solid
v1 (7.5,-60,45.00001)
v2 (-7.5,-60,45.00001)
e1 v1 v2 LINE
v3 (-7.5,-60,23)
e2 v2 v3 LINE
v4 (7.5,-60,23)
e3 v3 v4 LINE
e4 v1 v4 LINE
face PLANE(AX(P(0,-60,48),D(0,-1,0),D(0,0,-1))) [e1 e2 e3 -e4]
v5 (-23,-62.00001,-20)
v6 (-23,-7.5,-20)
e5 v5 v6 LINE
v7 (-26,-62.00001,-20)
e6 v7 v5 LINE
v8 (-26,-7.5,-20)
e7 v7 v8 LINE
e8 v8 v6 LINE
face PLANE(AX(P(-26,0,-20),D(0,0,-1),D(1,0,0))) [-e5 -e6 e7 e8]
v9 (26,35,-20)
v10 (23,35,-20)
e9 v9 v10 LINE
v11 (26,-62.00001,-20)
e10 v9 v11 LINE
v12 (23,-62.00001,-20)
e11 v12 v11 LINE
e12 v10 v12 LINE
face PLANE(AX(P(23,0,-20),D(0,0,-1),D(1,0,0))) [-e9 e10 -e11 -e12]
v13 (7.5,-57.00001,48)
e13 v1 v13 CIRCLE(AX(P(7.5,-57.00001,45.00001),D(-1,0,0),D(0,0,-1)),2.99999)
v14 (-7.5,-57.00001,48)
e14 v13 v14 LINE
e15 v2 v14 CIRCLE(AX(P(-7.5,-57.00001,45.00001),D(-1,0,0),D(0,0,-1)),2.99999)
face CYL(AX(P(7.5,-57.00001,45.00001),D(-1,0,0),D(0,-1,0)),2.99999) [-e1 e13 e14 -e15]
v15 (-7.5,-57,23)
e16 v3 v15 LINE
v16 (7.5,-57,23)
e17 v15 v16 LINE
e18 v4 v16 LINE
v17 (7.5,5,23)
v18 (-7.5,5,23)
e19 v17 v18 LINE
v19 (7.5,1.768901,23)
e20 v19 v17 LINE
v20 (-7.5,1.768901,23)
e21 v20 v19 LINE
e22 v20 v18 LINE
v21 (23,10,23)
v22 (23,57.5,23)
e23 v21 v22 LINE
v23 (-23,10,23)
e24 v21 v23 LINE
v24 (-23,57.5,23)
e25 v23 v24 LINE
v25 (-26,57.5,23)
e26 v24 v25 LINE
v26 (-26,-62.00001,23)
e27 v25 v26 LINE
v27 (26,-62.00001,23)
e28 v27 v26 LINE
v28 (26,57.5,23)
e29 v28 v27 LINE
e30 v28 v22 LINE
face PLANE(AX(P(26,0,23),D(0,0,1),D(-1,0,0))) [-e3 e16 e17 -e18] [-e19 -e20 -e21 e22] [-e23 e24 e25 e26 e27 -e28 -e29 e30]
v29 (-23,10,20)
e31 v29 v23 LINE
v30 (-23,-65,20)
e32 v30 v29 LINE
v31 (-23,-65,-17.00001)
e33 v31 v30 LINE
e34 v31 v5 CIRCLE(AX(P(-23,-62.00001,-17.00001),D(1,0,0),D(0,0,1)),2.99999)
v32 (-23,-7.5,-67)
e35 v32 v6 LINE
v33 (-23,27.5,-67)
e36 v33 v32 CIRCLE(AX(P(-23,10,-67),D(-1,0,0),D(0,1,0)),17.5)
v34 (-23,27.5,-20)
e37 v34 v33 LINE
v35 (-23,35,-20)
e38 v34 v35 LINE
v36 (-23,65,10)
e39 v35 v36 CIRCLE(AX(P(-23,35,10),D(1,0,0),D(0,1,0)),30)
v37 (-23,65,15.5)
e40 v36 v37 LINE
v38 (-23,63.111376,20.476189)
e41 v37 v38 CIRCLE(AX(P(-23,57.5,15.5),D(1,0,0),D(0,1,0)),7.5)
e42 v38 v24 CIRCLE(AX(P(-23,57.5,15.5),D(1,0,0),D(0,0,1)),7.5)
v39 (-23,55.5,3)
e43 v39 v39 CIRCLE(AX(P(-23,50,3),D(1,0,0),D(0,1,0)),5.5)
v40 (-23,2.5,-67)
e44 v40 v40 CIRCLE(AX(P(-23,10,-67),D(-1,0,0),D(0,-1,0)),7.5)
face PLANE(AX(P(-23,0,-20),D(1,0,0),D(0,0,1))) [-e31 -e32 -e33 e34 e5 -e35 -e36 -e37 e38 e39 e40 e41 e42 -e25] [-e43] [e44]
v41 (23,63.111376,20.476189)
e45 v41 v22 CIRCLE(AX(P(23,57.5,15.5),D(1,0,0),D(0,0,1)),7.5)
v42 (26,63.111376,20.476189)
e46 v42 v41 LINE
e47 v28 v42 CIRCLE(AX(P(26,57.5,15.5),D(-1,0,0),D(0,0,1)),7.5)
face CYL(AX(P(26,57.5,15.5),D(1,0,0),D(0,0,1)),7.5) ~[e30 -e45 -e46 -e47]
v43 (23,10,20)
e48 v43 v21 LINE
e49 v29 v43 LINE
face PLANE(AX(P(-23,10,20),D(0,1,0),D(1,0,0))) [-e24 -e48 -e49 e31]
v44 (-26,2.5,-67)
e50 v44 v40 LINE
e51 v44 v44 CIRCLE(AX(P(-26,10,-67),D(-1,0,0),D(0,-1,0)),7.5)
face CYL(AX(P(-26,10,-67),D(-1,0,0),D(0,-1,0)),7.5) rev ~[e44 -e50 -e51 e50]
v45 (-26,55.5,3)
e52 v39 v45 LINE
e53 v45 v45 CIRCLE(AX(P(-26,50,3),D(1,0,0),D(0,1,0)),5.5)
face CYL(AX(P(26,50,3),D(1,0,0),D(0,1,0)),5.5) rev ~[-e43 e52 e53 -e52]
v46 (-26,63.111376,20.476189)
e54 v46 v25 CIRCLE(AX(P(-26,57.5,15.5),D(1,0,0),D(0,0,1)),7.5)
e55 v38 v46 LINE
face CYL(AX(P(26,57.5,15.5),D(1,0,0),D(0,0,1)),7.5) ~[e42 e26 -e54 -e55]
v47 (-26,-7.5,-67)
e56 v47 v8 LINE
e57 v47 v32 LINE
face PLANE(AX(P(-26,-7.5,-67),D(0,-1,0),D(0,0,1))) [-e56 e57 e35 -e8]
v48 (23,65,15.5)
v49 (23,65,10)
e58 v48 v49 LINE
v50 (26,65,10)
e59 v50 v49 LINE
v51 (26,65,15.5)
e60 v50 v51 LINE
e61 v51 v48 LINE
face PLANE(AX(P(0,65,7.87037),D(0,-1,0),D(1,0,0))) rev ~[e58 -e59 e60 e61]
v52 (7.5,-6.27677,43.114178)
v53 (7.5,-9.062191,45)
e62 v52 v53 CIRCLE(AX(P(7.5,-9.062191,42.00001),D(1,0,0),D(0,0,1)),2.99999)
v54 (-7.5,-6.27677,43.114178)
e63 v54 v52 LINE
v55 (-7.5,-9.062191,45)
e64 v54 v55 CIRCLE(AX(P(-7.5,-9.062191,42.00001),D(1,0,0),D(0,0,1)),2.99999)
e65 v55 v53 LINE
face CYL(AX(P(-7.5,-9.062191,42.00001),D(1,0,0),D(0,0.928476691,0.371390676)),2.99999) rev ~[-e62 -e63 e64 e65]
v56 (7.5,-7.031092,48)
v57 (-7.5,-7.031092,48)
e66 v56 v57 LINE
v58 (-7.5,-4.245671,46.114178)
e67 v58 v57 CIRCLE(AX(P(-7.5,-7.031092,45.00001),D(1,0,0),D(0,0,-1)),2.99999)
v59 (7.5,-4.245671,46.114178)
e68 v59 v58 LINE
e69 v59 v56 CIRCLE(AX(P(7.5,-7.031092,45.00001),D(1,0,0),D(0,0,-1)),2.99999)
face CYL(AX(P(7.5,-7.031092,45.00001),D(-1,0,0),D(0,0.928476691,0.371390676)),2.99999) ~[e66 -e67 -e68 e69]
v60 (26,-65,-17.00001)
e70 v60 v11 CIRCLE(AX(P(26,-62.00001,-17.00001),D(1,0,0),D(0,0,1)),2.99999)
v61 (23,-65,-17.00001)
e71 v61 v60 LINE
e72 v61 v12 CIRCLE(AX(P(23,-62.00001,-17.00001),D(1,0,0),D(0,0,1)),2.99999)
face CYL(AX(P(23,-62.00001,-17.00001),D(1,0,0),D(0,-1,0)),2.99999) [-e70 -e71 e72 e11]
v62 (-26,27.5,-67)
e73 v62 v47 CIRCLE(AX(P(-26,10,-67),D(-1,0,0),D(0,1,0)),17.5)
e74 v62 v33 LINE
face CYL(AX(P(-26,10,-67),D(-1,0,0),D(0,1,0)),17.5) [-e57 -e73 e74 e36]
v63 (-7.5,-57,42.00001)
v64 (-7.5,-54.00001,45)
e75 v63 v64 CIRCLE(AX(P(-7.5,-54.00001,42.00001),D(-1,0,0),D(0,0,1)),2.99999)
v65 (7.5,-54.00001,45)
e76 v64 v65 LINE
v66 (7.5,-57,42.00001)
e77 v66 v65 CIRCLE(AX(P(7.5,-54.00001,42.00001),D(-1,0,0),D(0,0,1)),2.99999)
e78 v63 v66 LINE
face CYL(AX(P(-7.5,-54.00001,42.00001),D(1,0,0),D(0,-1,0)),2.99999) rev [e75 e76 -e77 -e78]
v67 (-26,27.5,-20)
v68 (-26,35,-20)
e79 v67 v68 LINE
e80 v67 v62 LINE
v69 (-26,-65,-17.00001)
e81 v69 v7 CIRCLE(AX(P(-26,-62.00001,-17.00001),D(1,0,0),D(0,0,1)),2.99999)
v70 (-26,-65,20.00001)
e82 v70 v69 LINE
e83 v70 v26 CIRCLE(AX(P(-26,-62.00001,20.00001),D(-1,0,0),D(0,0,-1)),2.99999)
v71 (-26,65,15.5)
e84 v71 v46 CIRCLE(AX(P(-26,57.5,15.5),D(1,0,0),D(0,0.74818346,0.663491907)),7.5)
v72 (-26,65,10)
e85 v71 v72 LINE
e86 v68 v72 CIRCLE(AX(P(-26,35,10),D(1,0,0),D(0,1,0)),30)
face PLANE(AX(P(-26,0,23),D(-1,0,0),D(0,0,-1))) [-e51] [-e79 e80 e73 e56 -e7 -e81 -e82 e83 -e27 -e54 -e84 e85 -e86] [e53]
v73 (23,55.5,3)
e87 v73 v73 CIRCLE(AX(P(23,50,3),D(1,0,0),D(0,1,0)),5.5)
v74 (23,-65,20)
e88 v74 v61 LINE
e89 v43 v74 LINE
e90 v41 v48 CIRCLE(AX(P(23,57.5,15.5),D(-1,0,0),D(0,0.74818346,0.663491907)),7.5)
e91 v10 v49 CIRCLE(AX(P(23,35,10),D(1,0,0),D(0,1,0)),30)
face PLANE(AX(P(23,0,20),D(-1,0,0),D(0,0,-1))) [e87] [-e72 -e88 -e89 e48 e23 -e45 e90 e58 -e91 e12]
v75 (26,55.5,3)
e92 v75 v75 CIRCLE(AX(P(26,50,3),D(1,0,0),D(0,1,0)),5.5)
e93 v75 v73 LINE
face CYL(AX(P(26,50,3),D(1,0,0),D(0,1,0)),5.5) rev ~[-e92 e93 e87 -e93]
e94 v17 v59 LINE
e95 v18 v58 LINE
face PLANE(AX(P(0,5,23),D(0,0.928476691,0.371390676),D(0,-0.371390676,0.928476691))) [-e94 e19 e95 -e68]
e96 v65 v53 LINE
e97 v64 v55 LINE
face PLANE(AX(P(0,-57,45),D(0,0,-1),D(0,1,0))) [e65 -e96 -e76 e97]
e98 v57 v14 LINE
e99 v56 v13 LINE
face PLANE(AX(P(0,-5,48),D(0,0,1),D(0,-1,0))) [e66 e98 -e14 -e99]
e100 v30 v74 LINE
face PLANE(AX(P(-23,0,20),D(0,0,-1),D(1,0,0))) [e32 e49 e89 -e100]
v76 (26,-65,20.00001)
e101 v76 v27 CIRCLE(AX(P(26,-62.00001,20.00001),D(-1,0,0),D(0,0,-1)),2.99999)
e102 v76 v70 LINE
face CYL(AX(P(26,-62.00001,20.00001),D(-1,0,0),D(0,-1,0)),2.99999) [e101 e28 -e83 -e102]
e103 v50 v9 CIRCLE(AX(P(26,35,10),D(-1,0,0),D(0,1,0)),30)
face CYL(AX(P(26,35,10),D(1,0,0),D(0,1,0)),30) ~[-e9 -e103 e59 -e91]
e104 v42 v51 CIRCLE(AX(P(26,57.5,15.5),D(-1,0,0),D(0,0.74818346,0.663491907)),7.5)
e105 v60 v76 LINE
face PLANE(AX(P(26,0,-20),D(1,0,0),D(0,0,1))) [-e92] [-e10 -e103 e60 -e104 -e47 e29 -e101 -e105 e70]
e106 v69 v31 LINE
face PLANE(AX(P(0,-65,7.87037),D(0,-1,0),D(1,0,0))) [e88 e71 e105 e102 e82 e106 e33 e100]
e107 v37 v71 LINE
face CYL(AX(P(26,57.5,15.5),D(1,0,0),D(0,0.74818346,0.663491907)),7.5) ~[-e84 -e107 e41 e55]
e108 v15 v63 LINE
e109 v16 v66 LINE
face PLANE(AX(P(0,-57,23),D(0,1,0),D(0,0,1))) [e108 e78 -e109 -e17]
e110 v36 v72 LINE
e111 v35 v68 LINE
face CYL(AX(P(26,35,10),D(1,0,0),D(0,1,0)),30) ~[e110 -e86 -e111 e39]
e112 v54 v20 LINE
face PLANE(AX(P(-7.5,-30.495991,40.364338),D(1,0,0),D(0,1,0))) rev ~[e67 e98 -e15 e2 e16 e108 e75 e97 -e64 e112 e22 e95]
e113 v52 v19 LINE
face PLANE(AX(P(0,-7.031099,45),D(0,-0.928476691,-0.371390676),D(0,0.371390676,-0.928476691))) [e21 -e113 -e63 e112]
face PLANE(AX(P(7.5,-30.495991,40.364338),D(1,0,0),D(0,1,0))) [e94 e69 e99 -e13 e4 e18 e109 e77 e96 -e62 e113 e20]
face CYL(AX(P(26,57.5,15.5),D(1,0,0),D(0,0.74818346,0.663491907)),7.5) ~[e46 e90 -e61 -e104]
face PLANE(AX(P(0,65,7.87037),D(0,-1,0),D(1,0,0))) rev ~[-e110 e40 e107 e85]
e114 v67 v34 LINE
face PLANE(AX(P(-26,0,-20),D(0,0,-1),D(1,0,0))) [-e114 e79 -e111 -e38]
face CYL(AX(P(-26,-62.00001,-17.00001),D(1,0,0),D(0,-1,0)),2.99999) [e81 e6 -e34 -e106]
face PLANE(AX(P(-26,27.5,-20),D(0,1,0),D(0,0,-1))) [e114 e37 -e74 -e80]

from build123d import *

# Parameters (mm, degrees)
F1_DEPTH = 65
F2_R     = 5.5
F3_DEPTH = 52.001
F4_W     = 46
F4_H     = 55
F5_DEPTH = 25
F7_DEPTH = 7.5
F8_R     = 7.5
F9_DEPTH = 3
F10_R    = 2.99999


# Not quite as in the source:
# - a fillet or chamfer is up to 0.001 mm smaller than in the source, because OpenCascade refuses the exact size
# - a feature names something its author has since deleted; it is built from what else it names


with BuildPart() as f1:
    # F0 (on Front) → F1 (new body, symmetric)
    with BuildSketch(Plane.XZ):
        Polygon((-23, 20), (23, 20), (23, -20), (26, -20), (26, 23), (-26, 23), (-26, -20), (-23, -20), align=None)
    extrude(amount=F1_DEPTH, both=True)

    # F2 (on face) → F3 (cut, through all)
    with BuildSketch(Plane.YZ.offset(26)):
        with Locations((50, 3)):
            Circle(F2_R)
        with BuildLine():
            Line((65, -20), (65, 10))
            ThreePointArc((65, 10), (56.2132034356, -11.2132034356), (35, -20))
            Line((35, -20), (65, -20))
        make_face()
        with BuildLine():
            ThreePointArc((63.1113759485, 20.4761893015), (64.5119654739, 18.161266652), (65, 15.5))
            Line((65, 15.5), (65, 23))
            Line((65, 23), (62.0370116692, 23))
            ThreePointArc((62.0370116692, 23), (62.6030536231, 21.7503800228), (63.1113759485, 20.4761893015))
        make_face()
        with BuildLine():
            ThreePointArc((57.5, 23), (60.5764086399, 22.3400080322), (63.1113759485, 20.4761893015))
            ThreePointArc((63.1113759485, 20.4761893015), (62.6030536231, 21.7503800228), (62.0370116692, 23))
            Line((62.0370116692, 23), (57.5, 23))
        make_face()
    extrude(amount=-F3_DEPTH, mode=Mode.SUBTRACT)

    # F4 (on face) → F5 (cut)
    with BuildSketch(Plane(origin=(0, 0, 20), x_dir=(1, 0, 0), z_dir=(0, 0, -1))):
        with Locations((0, -37.5)):
            Rectangle(F4_W, F4_H)
    extrude(amount=-F5_DEPTH, mode=Mode.SUBTRACT)

    # F6 (on Right) → F7 (join, symmetric)
    with BuildSketch(Plane.YZ):
        Polygon((-60, 48), (-60, 23), (-57, 23), (-57, 45), (-7.0310988843, 45), (1.7689011157, 23), (5, 23), (-5, 48), align=None)
    extrude(amount=F7_DEPTH, both=True)

    # F8 (on face) → F9 (join)
    with BuildSketch(Plane(origin=(-26, 0, 0), x_dir=(0, -1, 0), z_dir=(-1, 0, 0))):
        with BuildLine():
            Line((7.5, -20), (-27.5, -20))
            Line((-27.5, -20), (-27.5, -67))
            ThreePointArc((-27.5, -67), (-10, -49.5), (7.5, -67))
            Line((7.5, -67), (7.5, -20))
        make_face()
        with BuildLine():
            ThreePointArc((7.5, -67), (-10, -49.5), (-27.5, -67))
            ThreePointArc((-27.5, -67), (-10, -84.5), (7.5, -67))
        make_face()
        with Locations((-10, -67)):
            Circle(F8_R, mode=Mode.SUBTRACT)
    extrude(amount=-F9_DEPTH)

    # F10 (radius 3 in the source; OpenCascade refuses exactly that, so slightly less here)
    f10_edges = [f1.edges().sort_by_distance(p)[0] for p in [
        (24.5, -65, -20),
        (-24.5, -65, -20),
        (0, -60, 48),
        (0, -57, 45),
        (0, -7.031099, 45),
        (0, -5, 48),
        (0, -65, 23),
    ]]
    fillet(f10_edges, radius=F10_R)


solid = f1.part
